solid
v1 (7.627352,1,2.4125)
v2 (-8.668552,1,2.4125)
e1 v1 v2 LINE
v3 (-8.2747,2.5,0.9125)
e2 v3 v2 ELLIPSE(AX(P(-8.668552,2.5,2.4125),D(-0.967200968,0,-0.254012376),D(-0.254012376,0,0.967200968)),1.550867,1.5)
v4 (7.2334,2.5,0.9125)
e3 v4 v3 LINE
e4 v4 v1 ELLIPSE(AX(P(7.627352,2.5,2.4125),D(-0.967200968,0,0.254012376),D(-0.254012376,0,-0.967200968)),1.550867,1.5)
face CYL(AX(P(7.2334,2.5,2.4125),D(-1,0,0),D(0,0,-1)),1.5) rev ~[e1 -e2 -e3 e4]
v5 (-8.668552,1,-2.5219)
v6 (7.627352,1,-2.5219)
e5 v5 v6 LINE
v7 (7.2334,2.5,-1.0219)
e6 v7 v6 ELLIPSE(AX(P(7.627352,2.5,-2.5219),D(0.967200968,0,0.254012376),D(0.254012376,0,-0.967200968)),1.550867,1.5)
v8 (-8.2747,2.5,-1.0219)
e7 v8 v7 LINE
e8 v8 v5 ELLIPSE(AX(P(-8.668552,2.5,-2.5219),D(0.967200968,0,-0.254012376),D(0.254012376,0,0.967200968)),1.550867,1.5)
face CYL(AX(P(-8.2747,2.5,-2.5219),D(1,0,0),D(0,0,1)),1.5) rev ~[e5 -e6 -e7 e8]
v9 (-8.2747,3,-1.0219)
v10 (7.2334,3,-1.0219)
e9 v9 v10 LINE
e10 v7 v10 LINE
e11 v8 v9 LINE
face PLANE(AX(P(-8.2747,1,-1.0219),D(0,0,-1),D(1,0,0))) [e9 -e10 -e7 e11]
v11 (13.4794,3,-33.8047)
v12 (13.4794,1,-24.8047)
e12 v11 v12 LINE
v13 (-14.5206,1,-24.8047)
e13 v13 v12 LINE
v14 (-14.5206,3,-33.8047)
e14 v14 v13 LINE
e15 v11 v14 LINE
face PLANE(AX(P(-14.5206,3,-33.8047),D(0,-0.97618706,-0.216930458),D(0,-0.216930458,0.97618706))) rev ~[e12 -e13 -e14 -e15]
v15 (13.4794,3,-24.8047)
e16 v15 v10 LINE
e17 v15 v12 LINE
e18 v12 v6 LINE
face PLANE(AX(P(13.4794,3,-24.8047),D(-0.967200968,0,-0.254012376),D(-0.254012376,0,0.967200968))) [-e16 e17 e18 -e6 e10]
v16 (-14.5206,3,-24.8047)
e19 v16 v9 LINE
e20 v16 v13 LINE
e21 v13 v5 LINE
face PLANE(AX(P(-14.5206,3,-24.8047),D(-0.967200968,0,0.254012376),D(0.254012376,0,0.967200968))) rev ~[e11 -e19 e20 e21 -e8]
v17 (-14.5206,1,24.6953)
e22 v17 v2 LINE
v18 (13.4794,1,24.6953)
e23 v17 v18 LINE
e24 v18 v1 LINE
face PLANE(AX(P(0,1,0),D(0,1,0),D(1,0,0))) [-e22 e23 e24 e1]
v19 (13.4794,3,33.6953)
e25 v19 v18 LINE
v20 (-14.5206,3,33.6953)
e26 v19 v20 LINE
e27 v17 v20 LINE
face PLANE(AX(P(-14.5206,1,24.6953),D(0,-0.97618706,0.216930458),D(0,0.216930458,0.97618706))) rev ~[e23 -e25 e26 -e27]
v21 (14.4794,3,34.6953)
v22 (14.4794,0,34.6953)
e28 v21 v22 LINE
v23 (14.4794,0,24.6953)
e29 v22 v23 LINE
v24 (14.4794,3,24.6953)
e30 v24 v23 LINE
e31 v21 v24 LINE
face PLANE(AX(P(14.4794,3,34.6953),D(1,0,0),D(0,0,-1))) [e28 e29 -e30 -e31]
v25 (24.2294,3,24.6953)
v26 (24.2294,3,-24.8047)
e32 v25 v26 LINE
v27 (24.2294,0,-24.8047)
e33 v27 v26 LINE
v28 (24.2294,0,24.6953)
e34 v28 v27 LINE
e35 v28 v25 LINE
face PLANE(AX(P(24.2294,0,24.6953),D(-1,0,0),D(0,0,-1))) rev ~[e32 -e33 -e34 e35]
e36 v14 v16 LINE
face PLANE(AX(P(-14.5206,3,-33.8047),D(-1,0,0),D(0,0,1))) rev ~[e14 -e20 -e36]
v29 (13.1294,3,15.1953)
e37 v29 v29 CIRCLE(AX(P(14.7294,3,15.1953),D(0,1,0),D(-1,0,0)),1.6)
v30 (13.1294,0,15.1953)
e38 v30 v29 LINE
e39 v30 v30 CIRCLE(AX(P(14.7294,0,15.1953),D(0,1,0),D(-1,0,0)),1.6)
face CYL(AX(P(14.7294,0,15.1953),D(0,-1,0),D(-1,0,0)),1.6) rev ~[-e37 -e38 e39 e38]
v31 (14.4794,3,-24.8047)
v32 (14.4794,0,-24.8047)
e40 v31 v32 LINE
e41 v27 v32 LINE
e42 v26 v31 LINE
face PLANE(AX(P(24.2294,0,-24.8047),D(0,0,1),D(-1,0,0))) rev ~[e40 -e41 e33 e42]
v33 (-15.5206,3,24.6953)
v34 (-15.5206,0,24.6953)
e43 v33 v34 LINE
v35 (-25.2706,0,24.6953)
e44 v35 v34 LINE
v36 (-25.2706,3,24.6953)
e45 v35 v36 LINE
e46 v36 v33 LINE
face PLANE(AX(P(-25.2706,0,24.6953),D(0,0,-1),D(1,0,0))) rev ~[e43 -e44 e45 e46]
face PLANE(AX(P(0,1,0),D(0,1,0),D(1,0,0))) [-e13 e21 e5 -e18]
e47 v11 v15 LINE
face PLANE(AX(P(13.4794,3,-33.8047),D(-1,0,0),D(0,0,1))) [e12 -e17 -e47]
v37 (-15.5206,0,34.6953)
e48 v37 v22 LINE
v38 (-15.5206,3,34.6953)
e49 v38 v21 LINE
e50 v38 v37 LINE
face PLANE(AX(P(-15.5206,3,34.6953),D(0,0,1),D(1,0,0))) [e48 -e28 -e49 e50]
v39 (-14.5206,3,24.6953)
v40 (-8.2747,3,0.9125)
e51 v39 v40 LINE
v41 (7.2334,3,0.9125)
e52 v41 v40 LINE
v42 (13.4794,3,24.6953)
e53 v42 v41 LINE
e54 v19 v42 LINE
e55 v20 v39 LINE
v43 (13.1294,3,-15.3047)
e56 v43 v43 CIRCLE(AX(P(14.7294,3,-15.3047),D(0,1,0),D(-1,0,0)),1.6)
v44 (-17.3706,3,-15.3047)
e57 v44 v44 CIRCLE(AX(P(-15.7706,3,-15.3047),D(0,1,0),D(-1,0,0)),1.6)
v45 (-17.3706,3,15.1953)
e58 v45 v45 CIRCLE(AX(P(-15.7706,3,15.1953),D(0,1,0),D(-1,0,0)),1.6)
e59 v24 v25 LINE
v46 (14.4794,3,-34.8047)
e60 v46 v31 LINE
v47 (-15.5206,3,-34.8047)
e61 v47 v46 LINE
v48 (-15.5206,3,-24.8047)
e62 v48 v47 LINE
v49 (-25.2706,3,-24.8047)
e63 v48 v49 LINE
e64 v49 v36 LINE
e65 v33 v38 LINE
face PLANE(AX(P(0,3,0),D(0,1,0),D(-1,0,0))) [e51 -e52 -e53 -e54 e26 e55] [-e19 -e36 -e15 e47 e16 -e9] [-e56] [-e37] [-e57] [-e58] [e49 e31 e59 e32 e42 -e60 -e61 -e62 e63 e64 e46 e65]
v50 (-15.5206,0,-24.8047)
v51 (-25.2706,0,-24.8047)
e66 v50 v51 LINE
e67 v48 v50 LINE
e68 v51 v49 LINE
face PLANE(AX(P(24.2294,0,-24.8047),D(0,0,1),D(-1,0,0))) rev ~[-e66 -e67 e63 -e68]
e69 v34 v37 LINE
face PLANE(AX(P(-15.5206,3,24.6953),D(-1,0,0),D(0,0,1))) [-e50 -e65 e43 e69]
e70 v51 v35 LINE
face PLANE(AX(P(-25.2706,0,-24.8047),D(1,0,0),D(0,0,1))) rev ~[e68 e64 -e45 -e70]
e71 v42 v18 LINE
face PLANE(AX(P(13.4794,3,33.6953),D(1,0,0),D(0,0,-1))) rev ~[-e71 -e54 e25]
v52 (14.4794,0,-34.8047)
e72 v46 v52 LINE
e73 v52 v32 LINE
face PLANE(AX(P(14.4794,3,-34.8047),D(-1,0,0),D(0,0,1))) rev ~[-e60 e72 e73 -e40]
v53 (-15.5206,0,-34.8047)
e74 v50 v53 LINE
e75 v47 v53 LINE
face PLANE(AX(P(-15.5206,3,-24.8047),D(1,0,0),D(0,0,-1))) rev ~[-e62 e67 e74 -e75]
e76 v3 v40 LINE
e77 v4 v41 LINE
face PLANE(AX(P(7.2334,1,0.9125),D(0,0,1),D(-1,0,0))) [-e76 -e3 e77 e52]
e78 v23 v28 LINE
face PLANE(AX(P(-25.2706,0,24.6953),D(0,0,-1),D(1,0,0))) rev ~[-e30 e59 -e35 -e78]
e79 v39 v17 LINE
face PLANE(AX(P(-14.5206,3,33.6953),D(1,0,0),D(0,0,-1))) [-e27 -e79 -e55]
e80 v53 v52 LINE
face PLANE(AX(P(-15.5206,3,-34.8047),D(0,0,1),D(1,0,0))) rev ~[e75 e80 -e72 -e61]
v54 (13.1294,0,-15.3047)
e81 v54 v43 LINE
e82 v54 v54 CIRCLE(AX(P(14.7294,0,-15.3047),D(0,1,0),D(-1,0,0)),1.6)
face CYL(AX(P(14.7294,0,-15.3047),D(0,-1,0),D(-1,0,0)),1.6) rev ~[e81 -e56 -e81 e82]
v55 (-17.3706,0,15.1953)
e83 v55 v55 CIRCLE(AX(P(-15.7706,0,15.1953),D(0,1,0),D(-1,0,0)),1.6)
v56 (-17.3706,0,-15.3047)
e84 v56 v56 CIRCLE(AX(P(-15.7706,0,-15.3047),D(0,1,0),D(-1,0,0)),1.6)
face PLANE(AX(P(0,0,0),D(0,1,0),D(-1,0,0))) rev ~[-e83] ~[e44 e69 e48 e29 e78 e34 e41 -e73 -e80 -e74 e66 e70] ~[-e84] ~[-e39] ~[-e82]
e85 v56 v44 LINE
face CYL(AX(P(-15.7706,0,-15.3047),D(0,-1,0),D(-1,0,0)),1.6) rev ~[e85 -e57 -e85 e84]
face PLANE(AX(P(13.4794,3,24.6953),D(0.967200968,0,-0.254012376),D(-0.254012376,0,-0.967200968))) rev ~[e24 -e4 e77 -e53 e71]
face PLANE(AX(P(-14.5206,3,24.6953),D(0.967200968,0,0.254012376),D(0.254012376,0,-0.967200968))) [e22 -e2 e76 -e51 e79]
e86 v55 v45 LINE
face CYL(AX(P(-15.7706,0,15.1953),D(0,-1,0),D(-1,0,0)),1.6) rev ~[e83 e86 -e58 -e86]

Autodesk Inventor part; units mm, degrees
ref_plane "YZ Plane" through (0, 0, 0) normal (1, 0, 0) x (0, 1, 0)
ref_plane "XZ Plane" through (0, 0, 0) normal (0, 1, 0) x (-1, 0, 0)
ref_plane "XY Plane" through (0, 0, 0) normal (0, 0, 1) x (1, 0, 0)
sketch "Sketch1" plane through (0, 0, 0) normal (0, 1, 0) x (-1, 0, 0)
  line L0 (25.2706, 24.6953) -> (-24.2294, 24.6953)
  line L1 (-24.2294, 24.6953) -> (-24.2294, -24.8047)
  line L2 (-24.2294, -24.8047) -> (25.2706, -24.8047)
  line L3 (25.2706, -24.8047) -> (25.2706, 24.6953)
  circle A0 centre (15.7706, 15.1953) radius 1.6
  circle A1 centre (15.7706, -15.3047) radius 1.6
  circle A2 centre (-14.7294, 15.1953) radius 1.6
  circle A3 centre (-14.7294, -15.3047) radius 1.6
  dimension "d17" = 49.5
  dimension "d18" = 49.5
  dimension "d19" = 3.2
  dimension "d20" = 3.2
  dimension "d21" = 30.5
  dimension "d22" = 9.5
  dimension "d23" = 9.5
  dimension "d24" = 9.5
  dimension "d25" = 9.5
  dimension "d26" = 3.2
  dimension "d27" = 3.2
  dimension "d28" = 30.5
  dimension "d29" = 30.5
  dimension "d30" = 30.5
  dimension "d31" = 9.5
  dimension "d32" = 9.5
  dimension "d33" = 9.5
  dimension "d34" = 9.5
extrude "Extrusion1" add sketch "Sketch1" along normal blind 3
sketch "Sketch2" plane through (0, 3, 0) normal (0, 1, 0) x (1, 0, 0)
  line L0 (-25.2706, -24.6953) -> (24.2294, -24.6953) projected
  line L1 (-0.5206, -24.6953) -> (-0.5206, 24.8047)
  line L2 (24.2294, 24.8047) -> (-25.2706, 24.8047) projected
  line L3 (-0.5206, -24.6953) -> (-15.5206, -24.6953)
  line L4 (-15.5206, -24.6953) -> (-15.5206, -34.6953)
  line L5 (-15.5206, -34.6953) -> (14.4794, -34.6953)
  line L6 (14.4794, -34.6953) -> (14.4794, -24.6953)
  line L7 (14.4794, -24.6953) -> (-0.5206, -24.6953)
  line L8 (-0.5206, 24.8047) -> (-15.5206, 24.8047)
  line L9 (-15.5206, 24.8047) -> (-15.5206, 34.8047)
  line L10 (-15.5206, 34.8047) -> (14.4794, 34.8047)
  line L11 (14.4794, 34.8047) -> (14.4794, 24.8047)
  line L12 (-0.5206, 24.8047) -> (14.4794, 24.8047)
  point P0 (0, 0)
  dimension "d37" = 15
  dimension "d38" = 10
  dimension "d39" = 30
  dimension "d40" = 15
  dimension "d41" = 10
  dimension "d42" = 30
extrude "Extrusion2" add sketch "Sketch2" against normal blind 3
sketch "Sketch3" plane through (0, 3, 0) normal (0, 1, 0) x (1, 0, 0)
  line L0 (-15.5206, -34.6953) -> (14.4794, -34.6953) projected
  line L1 (-0.5206, -34.6953) -> (-0.5206, 34.8047)
  line L2 (-15.5206, 34.8047) -> (14.4794, 34.8047) projected
  line L3 (-0.5206, -34.6953) -> (-0.5206, -33.6953)
  line L4 (-0.5206, -33.6953) -> (-14.5206, -33.6953)
  line L5 (-14.5206, -33.6953) -> (-14.5206, -24.6953)
  line L6 (-0.5206, -33.6953) -> (13.4794, -33.6953)
  line L7 (13.4794, -33.6953) -> (13.4794, -24.6953)
  line L8 (-0.5206, 34.8047) -> (-0.5206, 33.8047)
  line L9 (-0.5206, 33.8047) -> (-14.5206, 33.8047)
  line L10 (-14.5206, 33.8047) -> (-14.5206, 24.8047)
  line L11 (-0.5206, 33.8047) -> (13.4794, 33.8047)
  line L12 (13.4794, 33.8047) -> (13.4794, 24.8047)
  circle A0 centre (-0.5206, 0.0547) radius 7.5
  line L13 (-14.5206, -24.6953) -> (-8.0206, 0.0547)
  line L14 (-14.5206, 24.8047) -> (-8.0206, 0.0547)
  line L15 (13.4794, -24.6953) -> (6.9794, 0.0547)
  line L16 (13.4794, 24.8047) -> (6.9794, 0.0547)
  point P0 (0, 0)
  dimension "d45" = 1
  dimension "d46" = 14
  dimension "d47" = 14
  dimension "d48" = 1
  dimension "d49" = 14
  dimension "d50" = 14
  dimension "d51" = 15
extrude "Extrusion3" cut sketch "Sketch3" against normal blind 2
sketch "Sketch4" plane through (0, 1, 0) normal (0, 1, 0) x (1, 0, 0)
  point P0 (0, 0)
sketch "Sketch5" plane through (0, 1, 0) normal (0, 1, 0) x (1, 0, 0)
  line L0 (-14.5206, -24.6953) -> (-8.0206, 0.0547) projected
  line L1 (6.9794, 0.0547) -> (13.4794, -24.6953) projected
  line L2 (-8.0206, 0.0547) -> (6.9794, 0.0547)
  line L3 (-8.0206, 0.0547) -> (-8.2747, 1.0219)
  line L4 (-8.0206, 0.0547) -> (-14.5206, 24.8047) projected
  line L5 (-8.0206, 0.0547) -> (-8.2747, -0.9125)
  line L6 (13.4794, 24.8047) -> (6.9794, 0.0547) projected
  line L7 (6.9794, 0.0547) -> (7.2334, 1.0219)
  line L8 (6.9794, 0.0547) -> (7.2334, -0.9125)
  line L9 (7.2334, -0.9125) -> (-8.2747, -0.9125)
  line L10 (-8.2747, 1.0219) -> (7.2334, 1.0219)
  point P0 (0, 0)
  dimension "d56" = 1
  dimension "d57" = 1
  dimension "d58" = 1
  dimension "d59" = 1
extrude "Extrusion4" add sketch "Sketch5" along normal blind 2
fillet "Face Fillet3" radius 1.5 1 edges at (-0.5206, 1, -1.0219)
fillet "Face Fillet4" radius 1.5 1 edges at (-0.5206, 1, 0.9125)
sketch "Sketch6" plane through (-14.5206, 3, -24.8047) normal (1, 0, 0) x (0, 0, -1)
  line L0 (-22.2828, -2) -> (0, -2) projected
  line L1 (9, 0) -> (9, -2) projected
  line L2 (0, -2) -> (9, -2)
  line L3 (9, -2) -> (9, 0)
  line L4 (9, 0) -> (0, -2)
  line L5 (-58.5, 0) -> (-49.5, 0) projected
  line L6 (-58.5, 0) -> (-58.5, -2)
  line L7 (-58.5, -2) -> (-49.5, -2)
  line L8 (-49.5, -2) -> (-58.5, 0)
  point P0 (-24.8047, -3)
extrude "Extrusion5" add sketch "Sketch6" along normal blind 28.9875
properties material "PC/ABS Plastic"
